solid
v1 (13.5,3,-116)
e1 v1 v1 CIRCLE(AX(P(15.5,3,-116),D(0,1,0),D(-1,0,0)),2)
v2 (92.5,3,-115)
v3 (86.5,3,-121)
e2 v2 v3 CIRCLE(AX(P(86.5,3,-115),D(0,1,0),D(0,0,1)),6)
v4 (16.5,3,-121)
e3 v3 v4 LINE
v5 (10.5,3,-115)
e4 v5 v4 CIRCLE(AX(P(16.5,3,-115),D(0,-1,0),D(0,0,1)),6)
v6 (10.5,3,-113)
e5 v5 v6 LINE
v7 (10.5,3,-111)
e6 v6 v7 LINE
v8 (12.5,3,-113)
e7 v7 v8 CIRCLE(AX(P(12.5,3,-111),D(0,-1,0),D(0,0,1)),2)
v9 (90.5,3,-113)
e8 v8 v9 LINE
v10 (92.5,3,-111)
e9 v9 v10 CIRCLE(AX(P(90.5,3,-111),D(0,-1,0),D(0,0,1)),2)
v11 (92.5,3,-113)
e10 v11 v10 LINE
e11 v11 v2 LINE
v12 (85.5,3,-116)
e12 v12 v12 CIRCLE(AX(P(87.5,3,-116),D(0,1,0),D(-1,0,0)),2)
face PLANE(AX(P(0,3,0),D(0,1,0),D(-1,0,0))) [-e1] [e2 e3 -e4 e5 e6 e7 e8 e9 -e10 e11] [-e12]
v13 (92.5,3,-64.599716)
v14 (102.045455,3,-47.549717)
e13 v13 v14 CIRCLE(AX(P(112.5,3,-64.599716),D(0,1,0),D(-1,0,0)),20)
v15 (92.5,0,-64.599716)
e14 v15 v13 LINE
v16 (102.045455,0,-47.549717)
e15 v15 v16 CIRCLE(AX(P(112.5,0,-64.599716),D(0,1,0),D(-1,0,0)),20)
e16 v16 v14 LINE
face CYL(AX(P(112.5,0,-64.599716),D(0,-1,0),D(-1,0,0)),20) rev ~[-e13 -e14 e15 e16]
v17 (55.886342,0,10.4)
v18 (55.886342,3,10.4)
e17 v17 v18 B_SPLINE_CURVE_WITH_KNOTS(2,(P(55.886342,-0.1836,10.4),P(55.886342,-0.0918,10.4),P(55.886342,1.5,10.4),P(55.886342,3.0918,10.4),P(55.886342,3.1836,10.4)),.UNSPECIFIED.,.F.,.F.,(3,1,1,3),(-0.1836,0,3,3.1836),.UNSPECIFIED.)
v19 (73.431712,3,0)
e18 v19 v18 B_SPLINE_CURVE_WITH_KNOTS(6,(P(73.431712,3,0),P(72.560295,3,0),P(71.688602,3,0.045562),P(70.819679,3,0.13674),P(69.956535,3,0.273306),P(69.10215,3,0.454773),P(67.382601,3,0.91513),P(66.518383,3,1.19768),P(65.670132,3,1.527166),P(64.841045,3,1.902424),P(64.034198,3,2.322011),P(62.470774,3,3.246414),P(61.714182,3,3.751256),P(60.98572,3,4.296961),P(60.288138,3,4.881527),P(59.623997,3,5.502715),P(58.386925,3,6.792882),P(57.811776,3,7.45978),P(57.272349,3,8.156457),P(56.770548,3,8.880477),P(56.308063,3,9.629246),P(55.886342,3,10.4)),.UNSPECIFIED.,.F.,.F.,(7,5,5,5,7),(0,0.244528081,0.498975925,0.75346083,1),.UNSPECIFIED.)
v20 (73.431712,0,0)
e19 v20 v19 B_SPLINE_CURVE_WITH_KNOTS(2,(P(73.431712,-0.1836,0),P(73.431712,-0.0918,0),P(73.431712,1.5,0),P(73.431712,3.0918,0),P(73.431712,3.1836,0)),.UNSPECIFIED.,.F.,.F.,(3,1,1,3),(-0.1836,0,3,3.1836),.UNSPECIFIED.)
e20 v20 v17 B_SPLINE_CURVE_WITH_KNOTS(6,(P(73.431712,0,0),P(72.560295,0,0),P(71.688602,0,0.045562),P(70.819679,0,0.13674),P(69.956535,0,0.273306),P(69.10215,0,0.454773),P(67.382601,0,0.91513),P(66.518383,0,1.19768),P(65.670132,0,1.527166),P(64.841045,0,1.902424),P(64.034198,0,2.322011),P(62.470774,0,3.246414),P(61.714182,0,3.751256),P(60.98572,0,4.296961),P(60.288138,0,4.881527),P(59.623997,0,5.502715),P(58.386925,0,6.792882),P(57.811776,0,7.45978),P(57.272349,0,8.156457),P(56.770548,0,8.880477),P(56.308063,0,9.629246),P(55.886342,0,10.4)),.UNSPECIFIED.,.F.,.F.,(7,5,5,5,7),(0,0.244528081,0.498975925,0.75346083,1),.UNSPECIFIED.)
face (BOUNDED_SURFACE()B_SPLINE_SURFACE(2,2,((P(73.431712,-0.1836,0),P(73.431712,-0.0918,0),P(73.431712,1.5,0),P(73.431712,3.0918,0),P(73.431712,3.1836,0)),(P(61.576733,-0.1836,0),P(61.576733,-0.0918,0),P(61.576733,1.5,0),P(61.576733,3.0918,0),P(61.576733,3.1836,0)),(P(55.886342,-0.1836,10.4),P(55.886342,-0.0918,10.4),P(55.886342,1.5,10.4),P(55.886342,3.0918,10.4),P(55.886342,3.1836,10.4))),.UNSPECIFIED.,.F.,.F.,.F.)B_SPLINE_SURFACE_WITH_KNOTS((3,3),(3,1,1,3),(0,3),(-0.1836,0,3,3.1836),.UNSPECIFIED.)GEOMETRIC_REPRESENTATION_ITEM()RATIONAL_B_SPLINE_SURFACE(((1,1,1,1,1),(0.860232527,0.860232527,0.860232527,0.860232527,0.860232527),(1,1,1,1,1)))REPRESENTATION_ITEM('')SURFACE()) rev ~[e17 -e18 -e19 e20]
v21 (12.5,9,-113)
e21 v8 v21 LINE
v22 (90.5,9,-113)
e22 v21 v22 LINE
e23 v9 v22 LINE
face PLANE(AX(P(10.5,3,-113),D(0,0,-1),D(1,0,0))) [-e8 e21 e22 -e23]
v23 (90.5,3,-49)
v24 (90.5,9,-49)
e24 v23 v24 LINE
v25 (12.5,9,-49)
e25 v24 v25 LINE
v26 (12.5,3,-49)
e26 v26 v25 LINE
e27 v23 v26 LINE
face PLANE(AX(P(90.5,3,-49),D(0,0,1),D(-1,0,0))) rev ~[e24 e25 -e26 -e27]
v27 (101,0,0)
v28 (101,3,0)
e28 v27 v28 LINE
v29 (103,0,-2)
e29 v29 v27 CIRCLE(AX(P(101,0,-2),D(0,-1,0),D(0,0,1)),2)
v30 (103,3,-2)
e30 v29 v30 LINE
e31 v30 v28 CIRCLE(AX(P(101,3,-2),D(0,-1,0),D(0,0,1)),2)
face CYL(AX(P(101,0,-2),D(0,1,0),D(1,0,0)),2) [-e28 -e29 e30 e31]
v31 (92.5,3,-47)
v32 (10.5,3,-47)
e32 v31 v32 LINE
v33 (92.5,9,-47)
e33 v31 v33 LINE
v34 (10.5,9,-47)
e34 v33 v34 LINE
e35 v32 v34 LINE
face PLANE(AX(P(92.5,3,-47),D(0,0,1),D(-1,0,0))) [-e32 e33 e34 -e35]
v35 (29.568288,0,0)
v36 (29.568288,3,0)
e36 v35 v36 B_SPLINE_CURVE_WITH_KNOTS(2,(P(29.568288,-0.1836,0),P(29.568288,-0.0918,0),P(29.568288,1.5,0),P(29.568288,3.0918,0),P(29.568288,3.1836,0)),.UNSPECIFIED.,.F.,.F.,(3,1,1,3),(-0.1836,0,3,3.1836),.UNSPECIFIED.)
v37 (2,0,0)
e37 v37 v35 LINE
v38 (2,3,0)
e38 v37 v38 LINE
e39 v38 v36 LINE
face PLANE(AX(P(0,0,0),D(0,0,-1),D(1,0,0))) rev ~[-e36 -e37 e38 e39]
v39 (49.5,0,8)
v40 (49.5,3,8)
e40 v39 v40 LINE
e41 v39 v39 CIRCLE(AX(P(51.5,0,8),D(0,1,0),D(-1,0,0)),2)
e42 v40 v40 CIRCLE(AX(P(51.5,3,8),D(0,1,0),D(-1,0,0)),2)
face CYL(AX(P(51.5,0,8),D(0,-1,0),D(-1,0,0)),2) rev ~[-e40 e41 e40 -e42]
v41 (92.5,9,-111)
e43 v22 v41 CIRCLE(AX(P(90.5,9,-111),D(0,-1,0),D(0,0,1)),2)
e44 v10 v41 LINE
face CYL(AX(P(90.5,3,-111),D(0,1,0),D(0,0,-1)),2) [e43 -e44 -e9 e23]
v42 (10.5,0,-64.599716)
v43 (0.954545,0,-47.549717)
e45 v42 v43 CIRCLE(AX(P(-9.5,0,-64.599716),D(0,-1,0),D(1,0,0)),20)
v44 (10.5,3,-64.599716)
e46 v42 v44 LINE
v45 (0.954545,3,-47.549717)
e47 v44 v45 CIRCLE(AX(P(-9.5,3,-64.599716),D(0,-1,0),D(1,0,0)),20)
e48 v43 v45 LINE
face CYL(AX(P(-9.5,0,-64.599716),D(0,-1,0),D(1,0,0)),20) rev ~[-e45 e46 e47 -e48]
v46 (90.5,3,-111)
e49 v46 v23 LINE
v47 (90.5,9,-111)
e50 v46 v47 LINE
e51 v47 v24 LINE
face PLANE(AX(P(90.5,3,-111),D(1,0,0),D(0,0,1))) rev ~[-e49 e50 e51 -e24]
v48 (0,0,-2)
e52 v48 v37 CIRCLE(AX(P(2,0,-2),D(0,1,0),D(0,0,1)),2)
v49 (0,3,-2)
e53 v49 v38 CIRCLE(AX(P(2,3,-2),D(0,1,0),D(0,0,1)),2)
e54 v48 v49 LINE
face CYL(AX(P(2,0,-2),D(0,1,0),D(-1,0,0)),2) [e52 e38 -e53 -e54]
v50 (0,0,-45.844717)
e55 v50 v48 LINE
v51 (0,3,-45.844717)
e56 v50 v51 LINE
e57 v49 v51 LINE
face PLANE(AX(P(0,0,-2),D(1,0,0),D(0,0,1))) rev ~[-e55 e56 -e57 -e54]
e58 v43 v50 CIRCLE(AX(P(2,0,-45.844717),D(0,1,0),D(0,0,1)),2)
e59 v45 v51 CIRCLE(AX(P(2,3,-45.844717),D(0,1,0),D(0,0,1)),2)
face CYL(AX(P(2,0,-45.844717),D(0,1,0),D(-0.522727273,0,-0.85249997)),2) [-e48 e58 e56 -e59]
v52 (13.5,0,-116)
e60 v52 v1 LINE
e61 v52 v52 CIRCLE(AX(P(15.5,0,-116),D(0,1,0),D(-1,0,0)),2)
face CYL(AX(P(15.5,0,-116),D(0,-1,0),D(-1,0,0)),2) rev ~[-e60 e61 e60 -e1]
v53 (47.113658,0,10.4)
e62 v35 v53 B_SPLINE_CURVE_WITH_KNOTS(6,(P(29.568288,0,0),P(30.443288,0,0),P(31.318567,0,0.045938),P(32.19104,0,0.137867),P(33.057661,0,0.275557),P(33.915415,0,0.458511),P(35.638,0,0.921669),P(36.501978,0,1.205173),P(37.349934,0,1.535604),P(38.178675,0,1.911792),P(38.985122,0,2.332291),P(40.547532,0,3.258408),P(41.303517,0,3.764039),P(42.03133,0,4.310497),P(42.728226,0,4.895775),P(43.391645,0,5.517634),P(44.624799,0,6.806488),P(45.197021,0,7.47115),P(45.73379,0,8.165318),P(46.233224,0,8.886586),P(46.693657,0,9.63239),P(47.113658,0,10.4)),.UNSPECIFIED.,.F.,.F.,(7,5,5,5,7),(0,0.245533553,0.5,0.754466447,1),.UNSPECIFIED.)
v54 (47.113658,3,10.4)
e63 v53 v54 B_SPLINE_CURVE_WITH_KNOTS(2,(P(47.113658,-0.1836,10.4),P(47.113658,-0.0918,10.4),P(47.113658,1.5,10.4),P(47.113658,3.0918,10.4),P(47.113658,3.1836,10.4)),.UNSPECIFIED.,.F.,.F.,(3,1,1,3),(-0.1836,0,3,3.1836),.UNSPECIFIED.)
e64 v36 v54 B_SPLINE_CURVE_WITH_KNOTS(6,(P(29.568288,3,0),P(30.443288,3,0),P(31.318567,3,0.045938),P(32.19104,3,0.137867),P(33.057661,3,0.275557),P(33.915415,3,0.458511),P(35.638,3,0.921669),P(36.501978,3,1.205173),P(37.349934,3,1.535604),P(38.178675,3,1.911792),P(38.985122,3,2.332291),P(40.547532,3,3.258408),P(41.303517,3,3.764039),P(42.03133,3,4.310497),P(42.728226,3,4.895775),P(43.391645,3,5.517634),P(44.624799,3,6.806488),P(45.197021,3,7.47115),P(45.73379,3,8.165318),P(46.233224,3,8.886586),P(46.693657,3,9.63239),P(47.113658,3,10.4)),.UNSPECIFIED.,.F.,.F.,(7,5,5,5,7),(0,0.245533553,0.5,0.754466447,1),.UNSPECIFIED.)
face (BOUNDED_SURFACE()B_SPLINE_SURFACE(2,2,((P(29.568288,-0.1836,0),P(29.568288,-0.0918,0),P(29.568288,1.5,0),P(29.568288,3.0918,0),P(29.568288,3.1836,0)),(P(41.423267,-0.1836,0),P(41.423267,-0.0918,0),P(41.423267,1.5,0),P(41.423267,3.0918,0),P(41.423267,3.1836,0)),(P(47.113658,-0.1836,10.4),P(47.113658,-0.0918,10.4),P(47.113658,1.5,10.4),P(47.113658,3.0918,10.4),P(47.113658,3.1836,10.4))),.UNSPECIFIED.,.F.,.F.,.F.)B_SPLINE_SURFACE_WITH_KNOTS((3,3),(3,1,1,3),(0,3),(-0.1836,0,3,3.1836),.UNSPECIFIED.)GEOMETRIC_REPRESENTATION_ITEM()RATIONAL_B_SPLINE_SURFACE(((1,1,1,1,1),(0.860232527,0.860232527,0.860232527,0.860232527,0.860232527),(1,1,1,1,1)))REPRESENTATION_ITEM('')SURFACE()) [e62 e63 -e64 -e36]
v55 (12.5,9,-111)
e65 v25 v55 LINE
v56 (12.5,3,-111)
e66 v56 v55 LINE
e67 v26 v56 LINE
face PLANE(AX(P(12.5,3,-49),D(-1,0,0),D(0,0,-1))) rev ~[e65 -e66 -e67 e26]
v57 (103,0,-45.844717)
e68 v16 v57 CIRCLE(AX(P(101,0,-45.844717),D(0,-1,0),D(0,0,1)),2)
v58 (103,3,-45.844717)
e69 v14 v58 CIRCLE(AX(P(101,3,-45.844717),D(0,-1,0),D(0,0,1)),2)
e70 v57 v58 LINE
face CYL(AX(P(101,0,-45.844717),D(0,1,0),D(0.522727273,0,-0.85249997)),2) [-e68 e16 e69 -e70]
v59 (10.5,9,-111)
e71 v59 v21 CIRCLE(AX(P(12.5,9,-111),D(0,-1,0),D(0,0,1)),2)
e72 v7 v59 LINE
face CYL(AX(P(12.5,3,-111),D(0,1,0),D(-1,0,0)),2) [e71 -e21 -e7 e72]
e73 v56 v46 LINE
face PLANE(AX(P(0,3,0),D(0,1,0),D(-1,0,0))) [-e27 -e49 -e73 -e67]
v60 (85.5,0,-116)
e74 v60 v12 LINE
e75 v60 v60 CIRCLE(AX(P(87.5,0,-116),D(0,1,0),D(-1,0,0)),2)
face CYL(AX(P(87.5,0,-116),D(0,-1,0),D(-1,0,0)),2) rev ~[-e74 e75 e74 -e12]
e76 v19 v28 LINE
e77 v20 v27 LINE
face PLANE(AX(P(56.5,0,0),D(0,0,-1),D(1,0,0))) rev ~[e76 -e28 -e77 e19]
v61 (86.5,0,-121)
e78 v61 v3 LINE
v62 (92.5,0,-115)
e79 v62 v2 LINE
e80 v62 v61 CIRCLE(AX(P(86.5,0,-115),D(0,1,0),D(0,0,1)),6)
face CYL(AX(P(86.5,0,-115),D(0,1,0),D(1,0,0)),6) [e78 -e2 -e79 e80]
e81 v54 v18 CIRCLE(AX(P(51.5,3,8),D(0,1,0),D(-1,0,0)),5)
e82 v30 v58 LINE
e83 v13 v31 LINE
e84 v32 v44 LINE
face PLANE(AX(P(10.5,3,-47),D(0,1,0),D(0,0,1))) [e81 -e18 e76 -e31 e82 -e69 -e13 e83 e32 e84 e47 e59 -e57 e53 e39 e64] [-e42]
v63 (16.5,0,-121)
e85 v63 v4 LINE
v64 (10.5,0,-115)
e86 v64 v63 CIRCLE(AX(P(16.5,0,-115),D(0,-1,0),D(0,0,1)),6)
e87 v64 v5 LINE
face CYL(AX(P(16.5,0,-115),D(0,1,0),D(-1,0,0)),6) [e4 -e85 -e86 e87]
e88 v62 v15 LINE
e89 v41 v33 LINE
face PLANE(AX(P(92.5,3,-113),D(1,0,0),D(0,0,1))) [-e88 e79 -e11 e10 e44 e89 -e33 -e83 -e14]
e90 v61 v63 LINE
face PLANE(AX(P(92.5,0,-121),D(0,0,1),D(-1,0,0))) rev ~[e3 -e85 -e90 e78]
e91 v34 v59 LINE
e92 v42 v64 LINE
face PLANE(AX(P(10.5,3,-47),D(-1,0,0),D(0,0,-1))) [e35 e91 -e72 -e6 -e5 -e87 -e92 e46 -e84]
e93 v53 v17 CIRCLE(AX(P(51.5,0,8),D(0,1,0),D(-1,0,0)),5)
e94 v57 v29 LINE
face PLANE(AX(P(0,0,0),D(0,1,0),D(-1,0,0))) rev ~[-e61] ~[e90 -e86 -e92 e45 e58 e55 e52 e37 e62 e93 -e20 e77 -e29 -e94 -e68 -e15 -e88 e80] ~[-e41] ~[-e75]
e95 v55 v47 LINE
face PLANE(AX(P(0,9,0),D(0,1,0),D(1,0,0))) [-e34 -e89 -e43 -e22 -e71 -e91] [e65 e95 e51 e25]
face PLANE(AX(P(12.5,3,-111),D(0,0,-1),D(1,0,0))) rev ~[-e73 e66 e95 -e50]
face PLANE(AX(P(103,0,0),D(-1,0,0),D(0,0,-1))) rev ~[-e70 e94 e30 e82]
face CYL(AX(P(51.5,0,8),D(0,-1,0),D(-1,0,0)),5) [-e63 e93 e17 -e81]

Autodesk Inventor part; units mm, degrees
ref_plane "YZ Plane" through (0, 0, 0) normal (1, 0, 0) x (0, 1, 0)
ref_plane "XZ Plane" through (0, 0, 0) normal (0, 1, 0) x (-1, 0, 0)
ref_plane "XY Plane" through (0, 0, 0) normal (0, 0, 1) x (1, 0, 0)
sketch "Sketch1" plane through (0, 0, 0) normal (0, 1, 0) x (-1, 0, 0)
  line L0 (0, 0) -> (-103, 0)
  line L1 (-103, 0) -> (-103, -121)
  line L2 (-103, -121) -> (0, -121)
  line L3 (0, -121) -> (0, 0)
  line L4 (-10.5, -121) -> (-92.5, -121)
  line L5 (-92.5, -121) -> (-92.5, -49)
  line L6 (-92.5, -49) -> (-10.5, -49)
  line L7 (-10.5, -49) -> (-10.5, -121)
  circle A0 centre (-15.5, -116) radius 2
  circle A1 centre (-87.5, -116) radius 2
  line L8 (0, -49) -> (-47, -49)
  line L9 (-47, -49) -> (-47, -2)
  line L10 (-47, -2) -> (0, -2)
  line L11 (0, -2) -> (0, -49)
  line L12 (-56, -49) -> (-103, -49)
  line L13 (-103, -49) -> (-103, -2)
  line L14 (-103, -2) -> (-56, -2)
  line L15 (-56, -2) -> (-56, -49)
  line L16 (-10.5, -49) -> (0, -49)
  line L17 (-92.5, -49) -> (-103, -49)
  circle A2 centre (-51.5, 8) radius 2
  circle A3 centre (-51.5, 8) radius 5
  line L18 (-46.5, 8) -> (-46.5, 0)
  line L19 (-46.5, 0) -> (-56.5, 0)
  line L20 (-56.5, 0) -> (-56.5, 8)
  line L21 (0, -47) -> (-103, -47)
  line L22 (-10.5, -49) -> (-10.5, -47)
  line L23 (-92.5, -49) -> (-92.5, -47)
  point P0 (0, -62)
  point P1 (-103, -62)
  point P2 (-51.5, -121)
  point P3 (-92.5, -121)
  point P4 (-10.5, -121)
  point P5 (0, -25.5)
  point P6 (-47, -25.5)
  point P7 (-56, -25.5)
  point P8 (-51.5, 0)
  point P9 (-56.5, 8)
  point P10 (-56.5, 0)
  point P11 (-46.5, 0)
  point P12 (-46.5, 8)
  dimension "d0" = 121
  dimension "d1" = 103
  dimension "d3" = 82
  dimension "d4" = 72
  dimension "d5" = 10.5
  dimension "d6" = 4
  dimension "d7" = 5
  dimension "d8" = 5
  dimension "d14" = 5
  dimension "d15" = 5
  dimension "d31" = 47
  dimension "d32" = 47
  dimension "d33" = 47
  dimension "d34" = 47
  dimension "d54" = 51.5
  dimension "d55" = 8
  dimension "d56" = 10
  dimension "d61" = 2
extrude "Extrusion1" add sketch "Sketch1" along normal blind 3 contours L3 L10 L9 L21 L15 L14 L1 L0 | L0 L20 A3 L18 | L3 L21 L9 L10 | A3 | L22 L6 L9 L21 | L9 L6 L15 L21 | L14 L15 L21 L1 | L7 L2 L5 L6 | L15 L6 L23 L21
sketch "Sketch2" plane through (0, 3, 0) normal (0, 1, 0) x (1, 0, 0)
  line L0 (0, 47) -> (47, 47)
  line L1 (47, 47) -> (47, 0)
  line L2 (47, 0) -> (0, 0)
  line L3 (0, 0) -> (0, 47)
  line L4 (0, 47) -> (0, 0) projected
  line L5 (0, 0) -> (103, 0) projected
  line L6 (56, 47) -> (103, 47)
  line L7 (103, 47) -> (103, 0)
  line L8 (103, 0) -> (56, 0)
  line L9 (56, 0) -> (56, 47)
  line L10 (103, 0) -> (103, 47) projected
  line L11 (92.5, 121) -> (10.5, 121) projected
  line L12 (10.5, 49) -> (0, 49) projected
  line L13 (12.5, 109) -> (90.5, 109)
  line L14 (90.5, 109) -> (90.5, 49)
  line L15 (90.5, 49) -> (12.5, 49)
  line L16 (12.5, 49) -> (12.5, 109)
  line L17 (10.5, 49) -> (10.5, 47)
  line L18 (92.5, 49) -> (92.5, 47)
  point P0 (23.5, 47)
  point P1 (105, 48)
  point P2 (0, 24.5)
  point P3 (10.5, 121)
  point P4 (56, 23.5)
  point P5 (47, 23.5)
  point P6 (0, 104.7)
  point P7 (105, 104.7)
  point P8 (103, 49)
  point P9 (90.5, 79)
  point P10 (12.5, 79)
  dimension "d21" = 47
  dimension "d22" = 47
  dimension "d26" = 47
  dimension "d38" = 2
  dimension "d39" = 78
  dimension "d40" = 60
  dimension "d43" = 12.5
sketch "Sketch3" plane through (0, 3, 0) normal (0, 1, 0) x (1, 0, 0)
  line L0 (10.5, 113) -> (92.5, 113)
  line L1 (92.5, 113) -> (92.5, 47)
  line L2 (92.5, 47) -> (10.5, 47)
  line L3 (10.5, 47) -> (10.5, 113)
  line L4 (12.5, 111) -> (90.5, 111)
  line L5 (90.5, 111) -> (90.5, 49)
  line L6 (90.5, 49) -> (12.5, 49)
  line L7 (12.5, 49) -> (12.5, 111)
  line L8 (0, 47) -> (0, 0) projected
  line L9 (0, 0) -> (103, 0) projected
  point P0 (0, 49)
  dimension "d44" = 78
  dimension "d45" = 62
  dimension "d46" = 12.5
  dimension "d47" = 49
  dimension "d48" = 82
  dimension "d49" = 2
  dimension "d51" = 66
  dimension "d52" = 2
fillet "Fillet1" radius 20 2 edges at (56.5, 1.5, 0) (46.5, 1.5, 0)
extrude "Extrusion2" add sketch "Sketch3" along normal blind 6
fillet "Fillet3" radius 20 2 edges at (92.5, 1.5, -47) (10.5, 1.5, -47)
fillet "Fillet4" radius 6 2 edges at (92.5, 1.5, -121) (10.5, 1.5, -121)
fillet "Fillet5" radius 2 6 edges at (0, 1.5, 0) (103, 1.5, 0) (0, 1.5, -47) (103, 1.5, -47) (92.5, 6, -113) (10.5, 6, -113)
equation "\"d0\" = d34 + d37 + d4"
equation "\"d1\" = 2 * d47 + d36"
equation "\"d5\" = -0.5 * d3 + 0.5 * d1"
equation "\"d54\" = 0.5 * d1"
equation "\"d38\" = d37"
equation "\"d43\" = -0.5 * d39 + 0.5 * d1"
equation "\"d44\" = d39"
equation "\"d46\" = d43"
equation "\"d47\" = d38 + d21"
equation "\"d48\" = d3"
equation "\"d2\" = 0.5 * d0"
equation "\"d37\" = 2"
equation "\"d36\" = 5"
properties part number "baseCarrito2"
